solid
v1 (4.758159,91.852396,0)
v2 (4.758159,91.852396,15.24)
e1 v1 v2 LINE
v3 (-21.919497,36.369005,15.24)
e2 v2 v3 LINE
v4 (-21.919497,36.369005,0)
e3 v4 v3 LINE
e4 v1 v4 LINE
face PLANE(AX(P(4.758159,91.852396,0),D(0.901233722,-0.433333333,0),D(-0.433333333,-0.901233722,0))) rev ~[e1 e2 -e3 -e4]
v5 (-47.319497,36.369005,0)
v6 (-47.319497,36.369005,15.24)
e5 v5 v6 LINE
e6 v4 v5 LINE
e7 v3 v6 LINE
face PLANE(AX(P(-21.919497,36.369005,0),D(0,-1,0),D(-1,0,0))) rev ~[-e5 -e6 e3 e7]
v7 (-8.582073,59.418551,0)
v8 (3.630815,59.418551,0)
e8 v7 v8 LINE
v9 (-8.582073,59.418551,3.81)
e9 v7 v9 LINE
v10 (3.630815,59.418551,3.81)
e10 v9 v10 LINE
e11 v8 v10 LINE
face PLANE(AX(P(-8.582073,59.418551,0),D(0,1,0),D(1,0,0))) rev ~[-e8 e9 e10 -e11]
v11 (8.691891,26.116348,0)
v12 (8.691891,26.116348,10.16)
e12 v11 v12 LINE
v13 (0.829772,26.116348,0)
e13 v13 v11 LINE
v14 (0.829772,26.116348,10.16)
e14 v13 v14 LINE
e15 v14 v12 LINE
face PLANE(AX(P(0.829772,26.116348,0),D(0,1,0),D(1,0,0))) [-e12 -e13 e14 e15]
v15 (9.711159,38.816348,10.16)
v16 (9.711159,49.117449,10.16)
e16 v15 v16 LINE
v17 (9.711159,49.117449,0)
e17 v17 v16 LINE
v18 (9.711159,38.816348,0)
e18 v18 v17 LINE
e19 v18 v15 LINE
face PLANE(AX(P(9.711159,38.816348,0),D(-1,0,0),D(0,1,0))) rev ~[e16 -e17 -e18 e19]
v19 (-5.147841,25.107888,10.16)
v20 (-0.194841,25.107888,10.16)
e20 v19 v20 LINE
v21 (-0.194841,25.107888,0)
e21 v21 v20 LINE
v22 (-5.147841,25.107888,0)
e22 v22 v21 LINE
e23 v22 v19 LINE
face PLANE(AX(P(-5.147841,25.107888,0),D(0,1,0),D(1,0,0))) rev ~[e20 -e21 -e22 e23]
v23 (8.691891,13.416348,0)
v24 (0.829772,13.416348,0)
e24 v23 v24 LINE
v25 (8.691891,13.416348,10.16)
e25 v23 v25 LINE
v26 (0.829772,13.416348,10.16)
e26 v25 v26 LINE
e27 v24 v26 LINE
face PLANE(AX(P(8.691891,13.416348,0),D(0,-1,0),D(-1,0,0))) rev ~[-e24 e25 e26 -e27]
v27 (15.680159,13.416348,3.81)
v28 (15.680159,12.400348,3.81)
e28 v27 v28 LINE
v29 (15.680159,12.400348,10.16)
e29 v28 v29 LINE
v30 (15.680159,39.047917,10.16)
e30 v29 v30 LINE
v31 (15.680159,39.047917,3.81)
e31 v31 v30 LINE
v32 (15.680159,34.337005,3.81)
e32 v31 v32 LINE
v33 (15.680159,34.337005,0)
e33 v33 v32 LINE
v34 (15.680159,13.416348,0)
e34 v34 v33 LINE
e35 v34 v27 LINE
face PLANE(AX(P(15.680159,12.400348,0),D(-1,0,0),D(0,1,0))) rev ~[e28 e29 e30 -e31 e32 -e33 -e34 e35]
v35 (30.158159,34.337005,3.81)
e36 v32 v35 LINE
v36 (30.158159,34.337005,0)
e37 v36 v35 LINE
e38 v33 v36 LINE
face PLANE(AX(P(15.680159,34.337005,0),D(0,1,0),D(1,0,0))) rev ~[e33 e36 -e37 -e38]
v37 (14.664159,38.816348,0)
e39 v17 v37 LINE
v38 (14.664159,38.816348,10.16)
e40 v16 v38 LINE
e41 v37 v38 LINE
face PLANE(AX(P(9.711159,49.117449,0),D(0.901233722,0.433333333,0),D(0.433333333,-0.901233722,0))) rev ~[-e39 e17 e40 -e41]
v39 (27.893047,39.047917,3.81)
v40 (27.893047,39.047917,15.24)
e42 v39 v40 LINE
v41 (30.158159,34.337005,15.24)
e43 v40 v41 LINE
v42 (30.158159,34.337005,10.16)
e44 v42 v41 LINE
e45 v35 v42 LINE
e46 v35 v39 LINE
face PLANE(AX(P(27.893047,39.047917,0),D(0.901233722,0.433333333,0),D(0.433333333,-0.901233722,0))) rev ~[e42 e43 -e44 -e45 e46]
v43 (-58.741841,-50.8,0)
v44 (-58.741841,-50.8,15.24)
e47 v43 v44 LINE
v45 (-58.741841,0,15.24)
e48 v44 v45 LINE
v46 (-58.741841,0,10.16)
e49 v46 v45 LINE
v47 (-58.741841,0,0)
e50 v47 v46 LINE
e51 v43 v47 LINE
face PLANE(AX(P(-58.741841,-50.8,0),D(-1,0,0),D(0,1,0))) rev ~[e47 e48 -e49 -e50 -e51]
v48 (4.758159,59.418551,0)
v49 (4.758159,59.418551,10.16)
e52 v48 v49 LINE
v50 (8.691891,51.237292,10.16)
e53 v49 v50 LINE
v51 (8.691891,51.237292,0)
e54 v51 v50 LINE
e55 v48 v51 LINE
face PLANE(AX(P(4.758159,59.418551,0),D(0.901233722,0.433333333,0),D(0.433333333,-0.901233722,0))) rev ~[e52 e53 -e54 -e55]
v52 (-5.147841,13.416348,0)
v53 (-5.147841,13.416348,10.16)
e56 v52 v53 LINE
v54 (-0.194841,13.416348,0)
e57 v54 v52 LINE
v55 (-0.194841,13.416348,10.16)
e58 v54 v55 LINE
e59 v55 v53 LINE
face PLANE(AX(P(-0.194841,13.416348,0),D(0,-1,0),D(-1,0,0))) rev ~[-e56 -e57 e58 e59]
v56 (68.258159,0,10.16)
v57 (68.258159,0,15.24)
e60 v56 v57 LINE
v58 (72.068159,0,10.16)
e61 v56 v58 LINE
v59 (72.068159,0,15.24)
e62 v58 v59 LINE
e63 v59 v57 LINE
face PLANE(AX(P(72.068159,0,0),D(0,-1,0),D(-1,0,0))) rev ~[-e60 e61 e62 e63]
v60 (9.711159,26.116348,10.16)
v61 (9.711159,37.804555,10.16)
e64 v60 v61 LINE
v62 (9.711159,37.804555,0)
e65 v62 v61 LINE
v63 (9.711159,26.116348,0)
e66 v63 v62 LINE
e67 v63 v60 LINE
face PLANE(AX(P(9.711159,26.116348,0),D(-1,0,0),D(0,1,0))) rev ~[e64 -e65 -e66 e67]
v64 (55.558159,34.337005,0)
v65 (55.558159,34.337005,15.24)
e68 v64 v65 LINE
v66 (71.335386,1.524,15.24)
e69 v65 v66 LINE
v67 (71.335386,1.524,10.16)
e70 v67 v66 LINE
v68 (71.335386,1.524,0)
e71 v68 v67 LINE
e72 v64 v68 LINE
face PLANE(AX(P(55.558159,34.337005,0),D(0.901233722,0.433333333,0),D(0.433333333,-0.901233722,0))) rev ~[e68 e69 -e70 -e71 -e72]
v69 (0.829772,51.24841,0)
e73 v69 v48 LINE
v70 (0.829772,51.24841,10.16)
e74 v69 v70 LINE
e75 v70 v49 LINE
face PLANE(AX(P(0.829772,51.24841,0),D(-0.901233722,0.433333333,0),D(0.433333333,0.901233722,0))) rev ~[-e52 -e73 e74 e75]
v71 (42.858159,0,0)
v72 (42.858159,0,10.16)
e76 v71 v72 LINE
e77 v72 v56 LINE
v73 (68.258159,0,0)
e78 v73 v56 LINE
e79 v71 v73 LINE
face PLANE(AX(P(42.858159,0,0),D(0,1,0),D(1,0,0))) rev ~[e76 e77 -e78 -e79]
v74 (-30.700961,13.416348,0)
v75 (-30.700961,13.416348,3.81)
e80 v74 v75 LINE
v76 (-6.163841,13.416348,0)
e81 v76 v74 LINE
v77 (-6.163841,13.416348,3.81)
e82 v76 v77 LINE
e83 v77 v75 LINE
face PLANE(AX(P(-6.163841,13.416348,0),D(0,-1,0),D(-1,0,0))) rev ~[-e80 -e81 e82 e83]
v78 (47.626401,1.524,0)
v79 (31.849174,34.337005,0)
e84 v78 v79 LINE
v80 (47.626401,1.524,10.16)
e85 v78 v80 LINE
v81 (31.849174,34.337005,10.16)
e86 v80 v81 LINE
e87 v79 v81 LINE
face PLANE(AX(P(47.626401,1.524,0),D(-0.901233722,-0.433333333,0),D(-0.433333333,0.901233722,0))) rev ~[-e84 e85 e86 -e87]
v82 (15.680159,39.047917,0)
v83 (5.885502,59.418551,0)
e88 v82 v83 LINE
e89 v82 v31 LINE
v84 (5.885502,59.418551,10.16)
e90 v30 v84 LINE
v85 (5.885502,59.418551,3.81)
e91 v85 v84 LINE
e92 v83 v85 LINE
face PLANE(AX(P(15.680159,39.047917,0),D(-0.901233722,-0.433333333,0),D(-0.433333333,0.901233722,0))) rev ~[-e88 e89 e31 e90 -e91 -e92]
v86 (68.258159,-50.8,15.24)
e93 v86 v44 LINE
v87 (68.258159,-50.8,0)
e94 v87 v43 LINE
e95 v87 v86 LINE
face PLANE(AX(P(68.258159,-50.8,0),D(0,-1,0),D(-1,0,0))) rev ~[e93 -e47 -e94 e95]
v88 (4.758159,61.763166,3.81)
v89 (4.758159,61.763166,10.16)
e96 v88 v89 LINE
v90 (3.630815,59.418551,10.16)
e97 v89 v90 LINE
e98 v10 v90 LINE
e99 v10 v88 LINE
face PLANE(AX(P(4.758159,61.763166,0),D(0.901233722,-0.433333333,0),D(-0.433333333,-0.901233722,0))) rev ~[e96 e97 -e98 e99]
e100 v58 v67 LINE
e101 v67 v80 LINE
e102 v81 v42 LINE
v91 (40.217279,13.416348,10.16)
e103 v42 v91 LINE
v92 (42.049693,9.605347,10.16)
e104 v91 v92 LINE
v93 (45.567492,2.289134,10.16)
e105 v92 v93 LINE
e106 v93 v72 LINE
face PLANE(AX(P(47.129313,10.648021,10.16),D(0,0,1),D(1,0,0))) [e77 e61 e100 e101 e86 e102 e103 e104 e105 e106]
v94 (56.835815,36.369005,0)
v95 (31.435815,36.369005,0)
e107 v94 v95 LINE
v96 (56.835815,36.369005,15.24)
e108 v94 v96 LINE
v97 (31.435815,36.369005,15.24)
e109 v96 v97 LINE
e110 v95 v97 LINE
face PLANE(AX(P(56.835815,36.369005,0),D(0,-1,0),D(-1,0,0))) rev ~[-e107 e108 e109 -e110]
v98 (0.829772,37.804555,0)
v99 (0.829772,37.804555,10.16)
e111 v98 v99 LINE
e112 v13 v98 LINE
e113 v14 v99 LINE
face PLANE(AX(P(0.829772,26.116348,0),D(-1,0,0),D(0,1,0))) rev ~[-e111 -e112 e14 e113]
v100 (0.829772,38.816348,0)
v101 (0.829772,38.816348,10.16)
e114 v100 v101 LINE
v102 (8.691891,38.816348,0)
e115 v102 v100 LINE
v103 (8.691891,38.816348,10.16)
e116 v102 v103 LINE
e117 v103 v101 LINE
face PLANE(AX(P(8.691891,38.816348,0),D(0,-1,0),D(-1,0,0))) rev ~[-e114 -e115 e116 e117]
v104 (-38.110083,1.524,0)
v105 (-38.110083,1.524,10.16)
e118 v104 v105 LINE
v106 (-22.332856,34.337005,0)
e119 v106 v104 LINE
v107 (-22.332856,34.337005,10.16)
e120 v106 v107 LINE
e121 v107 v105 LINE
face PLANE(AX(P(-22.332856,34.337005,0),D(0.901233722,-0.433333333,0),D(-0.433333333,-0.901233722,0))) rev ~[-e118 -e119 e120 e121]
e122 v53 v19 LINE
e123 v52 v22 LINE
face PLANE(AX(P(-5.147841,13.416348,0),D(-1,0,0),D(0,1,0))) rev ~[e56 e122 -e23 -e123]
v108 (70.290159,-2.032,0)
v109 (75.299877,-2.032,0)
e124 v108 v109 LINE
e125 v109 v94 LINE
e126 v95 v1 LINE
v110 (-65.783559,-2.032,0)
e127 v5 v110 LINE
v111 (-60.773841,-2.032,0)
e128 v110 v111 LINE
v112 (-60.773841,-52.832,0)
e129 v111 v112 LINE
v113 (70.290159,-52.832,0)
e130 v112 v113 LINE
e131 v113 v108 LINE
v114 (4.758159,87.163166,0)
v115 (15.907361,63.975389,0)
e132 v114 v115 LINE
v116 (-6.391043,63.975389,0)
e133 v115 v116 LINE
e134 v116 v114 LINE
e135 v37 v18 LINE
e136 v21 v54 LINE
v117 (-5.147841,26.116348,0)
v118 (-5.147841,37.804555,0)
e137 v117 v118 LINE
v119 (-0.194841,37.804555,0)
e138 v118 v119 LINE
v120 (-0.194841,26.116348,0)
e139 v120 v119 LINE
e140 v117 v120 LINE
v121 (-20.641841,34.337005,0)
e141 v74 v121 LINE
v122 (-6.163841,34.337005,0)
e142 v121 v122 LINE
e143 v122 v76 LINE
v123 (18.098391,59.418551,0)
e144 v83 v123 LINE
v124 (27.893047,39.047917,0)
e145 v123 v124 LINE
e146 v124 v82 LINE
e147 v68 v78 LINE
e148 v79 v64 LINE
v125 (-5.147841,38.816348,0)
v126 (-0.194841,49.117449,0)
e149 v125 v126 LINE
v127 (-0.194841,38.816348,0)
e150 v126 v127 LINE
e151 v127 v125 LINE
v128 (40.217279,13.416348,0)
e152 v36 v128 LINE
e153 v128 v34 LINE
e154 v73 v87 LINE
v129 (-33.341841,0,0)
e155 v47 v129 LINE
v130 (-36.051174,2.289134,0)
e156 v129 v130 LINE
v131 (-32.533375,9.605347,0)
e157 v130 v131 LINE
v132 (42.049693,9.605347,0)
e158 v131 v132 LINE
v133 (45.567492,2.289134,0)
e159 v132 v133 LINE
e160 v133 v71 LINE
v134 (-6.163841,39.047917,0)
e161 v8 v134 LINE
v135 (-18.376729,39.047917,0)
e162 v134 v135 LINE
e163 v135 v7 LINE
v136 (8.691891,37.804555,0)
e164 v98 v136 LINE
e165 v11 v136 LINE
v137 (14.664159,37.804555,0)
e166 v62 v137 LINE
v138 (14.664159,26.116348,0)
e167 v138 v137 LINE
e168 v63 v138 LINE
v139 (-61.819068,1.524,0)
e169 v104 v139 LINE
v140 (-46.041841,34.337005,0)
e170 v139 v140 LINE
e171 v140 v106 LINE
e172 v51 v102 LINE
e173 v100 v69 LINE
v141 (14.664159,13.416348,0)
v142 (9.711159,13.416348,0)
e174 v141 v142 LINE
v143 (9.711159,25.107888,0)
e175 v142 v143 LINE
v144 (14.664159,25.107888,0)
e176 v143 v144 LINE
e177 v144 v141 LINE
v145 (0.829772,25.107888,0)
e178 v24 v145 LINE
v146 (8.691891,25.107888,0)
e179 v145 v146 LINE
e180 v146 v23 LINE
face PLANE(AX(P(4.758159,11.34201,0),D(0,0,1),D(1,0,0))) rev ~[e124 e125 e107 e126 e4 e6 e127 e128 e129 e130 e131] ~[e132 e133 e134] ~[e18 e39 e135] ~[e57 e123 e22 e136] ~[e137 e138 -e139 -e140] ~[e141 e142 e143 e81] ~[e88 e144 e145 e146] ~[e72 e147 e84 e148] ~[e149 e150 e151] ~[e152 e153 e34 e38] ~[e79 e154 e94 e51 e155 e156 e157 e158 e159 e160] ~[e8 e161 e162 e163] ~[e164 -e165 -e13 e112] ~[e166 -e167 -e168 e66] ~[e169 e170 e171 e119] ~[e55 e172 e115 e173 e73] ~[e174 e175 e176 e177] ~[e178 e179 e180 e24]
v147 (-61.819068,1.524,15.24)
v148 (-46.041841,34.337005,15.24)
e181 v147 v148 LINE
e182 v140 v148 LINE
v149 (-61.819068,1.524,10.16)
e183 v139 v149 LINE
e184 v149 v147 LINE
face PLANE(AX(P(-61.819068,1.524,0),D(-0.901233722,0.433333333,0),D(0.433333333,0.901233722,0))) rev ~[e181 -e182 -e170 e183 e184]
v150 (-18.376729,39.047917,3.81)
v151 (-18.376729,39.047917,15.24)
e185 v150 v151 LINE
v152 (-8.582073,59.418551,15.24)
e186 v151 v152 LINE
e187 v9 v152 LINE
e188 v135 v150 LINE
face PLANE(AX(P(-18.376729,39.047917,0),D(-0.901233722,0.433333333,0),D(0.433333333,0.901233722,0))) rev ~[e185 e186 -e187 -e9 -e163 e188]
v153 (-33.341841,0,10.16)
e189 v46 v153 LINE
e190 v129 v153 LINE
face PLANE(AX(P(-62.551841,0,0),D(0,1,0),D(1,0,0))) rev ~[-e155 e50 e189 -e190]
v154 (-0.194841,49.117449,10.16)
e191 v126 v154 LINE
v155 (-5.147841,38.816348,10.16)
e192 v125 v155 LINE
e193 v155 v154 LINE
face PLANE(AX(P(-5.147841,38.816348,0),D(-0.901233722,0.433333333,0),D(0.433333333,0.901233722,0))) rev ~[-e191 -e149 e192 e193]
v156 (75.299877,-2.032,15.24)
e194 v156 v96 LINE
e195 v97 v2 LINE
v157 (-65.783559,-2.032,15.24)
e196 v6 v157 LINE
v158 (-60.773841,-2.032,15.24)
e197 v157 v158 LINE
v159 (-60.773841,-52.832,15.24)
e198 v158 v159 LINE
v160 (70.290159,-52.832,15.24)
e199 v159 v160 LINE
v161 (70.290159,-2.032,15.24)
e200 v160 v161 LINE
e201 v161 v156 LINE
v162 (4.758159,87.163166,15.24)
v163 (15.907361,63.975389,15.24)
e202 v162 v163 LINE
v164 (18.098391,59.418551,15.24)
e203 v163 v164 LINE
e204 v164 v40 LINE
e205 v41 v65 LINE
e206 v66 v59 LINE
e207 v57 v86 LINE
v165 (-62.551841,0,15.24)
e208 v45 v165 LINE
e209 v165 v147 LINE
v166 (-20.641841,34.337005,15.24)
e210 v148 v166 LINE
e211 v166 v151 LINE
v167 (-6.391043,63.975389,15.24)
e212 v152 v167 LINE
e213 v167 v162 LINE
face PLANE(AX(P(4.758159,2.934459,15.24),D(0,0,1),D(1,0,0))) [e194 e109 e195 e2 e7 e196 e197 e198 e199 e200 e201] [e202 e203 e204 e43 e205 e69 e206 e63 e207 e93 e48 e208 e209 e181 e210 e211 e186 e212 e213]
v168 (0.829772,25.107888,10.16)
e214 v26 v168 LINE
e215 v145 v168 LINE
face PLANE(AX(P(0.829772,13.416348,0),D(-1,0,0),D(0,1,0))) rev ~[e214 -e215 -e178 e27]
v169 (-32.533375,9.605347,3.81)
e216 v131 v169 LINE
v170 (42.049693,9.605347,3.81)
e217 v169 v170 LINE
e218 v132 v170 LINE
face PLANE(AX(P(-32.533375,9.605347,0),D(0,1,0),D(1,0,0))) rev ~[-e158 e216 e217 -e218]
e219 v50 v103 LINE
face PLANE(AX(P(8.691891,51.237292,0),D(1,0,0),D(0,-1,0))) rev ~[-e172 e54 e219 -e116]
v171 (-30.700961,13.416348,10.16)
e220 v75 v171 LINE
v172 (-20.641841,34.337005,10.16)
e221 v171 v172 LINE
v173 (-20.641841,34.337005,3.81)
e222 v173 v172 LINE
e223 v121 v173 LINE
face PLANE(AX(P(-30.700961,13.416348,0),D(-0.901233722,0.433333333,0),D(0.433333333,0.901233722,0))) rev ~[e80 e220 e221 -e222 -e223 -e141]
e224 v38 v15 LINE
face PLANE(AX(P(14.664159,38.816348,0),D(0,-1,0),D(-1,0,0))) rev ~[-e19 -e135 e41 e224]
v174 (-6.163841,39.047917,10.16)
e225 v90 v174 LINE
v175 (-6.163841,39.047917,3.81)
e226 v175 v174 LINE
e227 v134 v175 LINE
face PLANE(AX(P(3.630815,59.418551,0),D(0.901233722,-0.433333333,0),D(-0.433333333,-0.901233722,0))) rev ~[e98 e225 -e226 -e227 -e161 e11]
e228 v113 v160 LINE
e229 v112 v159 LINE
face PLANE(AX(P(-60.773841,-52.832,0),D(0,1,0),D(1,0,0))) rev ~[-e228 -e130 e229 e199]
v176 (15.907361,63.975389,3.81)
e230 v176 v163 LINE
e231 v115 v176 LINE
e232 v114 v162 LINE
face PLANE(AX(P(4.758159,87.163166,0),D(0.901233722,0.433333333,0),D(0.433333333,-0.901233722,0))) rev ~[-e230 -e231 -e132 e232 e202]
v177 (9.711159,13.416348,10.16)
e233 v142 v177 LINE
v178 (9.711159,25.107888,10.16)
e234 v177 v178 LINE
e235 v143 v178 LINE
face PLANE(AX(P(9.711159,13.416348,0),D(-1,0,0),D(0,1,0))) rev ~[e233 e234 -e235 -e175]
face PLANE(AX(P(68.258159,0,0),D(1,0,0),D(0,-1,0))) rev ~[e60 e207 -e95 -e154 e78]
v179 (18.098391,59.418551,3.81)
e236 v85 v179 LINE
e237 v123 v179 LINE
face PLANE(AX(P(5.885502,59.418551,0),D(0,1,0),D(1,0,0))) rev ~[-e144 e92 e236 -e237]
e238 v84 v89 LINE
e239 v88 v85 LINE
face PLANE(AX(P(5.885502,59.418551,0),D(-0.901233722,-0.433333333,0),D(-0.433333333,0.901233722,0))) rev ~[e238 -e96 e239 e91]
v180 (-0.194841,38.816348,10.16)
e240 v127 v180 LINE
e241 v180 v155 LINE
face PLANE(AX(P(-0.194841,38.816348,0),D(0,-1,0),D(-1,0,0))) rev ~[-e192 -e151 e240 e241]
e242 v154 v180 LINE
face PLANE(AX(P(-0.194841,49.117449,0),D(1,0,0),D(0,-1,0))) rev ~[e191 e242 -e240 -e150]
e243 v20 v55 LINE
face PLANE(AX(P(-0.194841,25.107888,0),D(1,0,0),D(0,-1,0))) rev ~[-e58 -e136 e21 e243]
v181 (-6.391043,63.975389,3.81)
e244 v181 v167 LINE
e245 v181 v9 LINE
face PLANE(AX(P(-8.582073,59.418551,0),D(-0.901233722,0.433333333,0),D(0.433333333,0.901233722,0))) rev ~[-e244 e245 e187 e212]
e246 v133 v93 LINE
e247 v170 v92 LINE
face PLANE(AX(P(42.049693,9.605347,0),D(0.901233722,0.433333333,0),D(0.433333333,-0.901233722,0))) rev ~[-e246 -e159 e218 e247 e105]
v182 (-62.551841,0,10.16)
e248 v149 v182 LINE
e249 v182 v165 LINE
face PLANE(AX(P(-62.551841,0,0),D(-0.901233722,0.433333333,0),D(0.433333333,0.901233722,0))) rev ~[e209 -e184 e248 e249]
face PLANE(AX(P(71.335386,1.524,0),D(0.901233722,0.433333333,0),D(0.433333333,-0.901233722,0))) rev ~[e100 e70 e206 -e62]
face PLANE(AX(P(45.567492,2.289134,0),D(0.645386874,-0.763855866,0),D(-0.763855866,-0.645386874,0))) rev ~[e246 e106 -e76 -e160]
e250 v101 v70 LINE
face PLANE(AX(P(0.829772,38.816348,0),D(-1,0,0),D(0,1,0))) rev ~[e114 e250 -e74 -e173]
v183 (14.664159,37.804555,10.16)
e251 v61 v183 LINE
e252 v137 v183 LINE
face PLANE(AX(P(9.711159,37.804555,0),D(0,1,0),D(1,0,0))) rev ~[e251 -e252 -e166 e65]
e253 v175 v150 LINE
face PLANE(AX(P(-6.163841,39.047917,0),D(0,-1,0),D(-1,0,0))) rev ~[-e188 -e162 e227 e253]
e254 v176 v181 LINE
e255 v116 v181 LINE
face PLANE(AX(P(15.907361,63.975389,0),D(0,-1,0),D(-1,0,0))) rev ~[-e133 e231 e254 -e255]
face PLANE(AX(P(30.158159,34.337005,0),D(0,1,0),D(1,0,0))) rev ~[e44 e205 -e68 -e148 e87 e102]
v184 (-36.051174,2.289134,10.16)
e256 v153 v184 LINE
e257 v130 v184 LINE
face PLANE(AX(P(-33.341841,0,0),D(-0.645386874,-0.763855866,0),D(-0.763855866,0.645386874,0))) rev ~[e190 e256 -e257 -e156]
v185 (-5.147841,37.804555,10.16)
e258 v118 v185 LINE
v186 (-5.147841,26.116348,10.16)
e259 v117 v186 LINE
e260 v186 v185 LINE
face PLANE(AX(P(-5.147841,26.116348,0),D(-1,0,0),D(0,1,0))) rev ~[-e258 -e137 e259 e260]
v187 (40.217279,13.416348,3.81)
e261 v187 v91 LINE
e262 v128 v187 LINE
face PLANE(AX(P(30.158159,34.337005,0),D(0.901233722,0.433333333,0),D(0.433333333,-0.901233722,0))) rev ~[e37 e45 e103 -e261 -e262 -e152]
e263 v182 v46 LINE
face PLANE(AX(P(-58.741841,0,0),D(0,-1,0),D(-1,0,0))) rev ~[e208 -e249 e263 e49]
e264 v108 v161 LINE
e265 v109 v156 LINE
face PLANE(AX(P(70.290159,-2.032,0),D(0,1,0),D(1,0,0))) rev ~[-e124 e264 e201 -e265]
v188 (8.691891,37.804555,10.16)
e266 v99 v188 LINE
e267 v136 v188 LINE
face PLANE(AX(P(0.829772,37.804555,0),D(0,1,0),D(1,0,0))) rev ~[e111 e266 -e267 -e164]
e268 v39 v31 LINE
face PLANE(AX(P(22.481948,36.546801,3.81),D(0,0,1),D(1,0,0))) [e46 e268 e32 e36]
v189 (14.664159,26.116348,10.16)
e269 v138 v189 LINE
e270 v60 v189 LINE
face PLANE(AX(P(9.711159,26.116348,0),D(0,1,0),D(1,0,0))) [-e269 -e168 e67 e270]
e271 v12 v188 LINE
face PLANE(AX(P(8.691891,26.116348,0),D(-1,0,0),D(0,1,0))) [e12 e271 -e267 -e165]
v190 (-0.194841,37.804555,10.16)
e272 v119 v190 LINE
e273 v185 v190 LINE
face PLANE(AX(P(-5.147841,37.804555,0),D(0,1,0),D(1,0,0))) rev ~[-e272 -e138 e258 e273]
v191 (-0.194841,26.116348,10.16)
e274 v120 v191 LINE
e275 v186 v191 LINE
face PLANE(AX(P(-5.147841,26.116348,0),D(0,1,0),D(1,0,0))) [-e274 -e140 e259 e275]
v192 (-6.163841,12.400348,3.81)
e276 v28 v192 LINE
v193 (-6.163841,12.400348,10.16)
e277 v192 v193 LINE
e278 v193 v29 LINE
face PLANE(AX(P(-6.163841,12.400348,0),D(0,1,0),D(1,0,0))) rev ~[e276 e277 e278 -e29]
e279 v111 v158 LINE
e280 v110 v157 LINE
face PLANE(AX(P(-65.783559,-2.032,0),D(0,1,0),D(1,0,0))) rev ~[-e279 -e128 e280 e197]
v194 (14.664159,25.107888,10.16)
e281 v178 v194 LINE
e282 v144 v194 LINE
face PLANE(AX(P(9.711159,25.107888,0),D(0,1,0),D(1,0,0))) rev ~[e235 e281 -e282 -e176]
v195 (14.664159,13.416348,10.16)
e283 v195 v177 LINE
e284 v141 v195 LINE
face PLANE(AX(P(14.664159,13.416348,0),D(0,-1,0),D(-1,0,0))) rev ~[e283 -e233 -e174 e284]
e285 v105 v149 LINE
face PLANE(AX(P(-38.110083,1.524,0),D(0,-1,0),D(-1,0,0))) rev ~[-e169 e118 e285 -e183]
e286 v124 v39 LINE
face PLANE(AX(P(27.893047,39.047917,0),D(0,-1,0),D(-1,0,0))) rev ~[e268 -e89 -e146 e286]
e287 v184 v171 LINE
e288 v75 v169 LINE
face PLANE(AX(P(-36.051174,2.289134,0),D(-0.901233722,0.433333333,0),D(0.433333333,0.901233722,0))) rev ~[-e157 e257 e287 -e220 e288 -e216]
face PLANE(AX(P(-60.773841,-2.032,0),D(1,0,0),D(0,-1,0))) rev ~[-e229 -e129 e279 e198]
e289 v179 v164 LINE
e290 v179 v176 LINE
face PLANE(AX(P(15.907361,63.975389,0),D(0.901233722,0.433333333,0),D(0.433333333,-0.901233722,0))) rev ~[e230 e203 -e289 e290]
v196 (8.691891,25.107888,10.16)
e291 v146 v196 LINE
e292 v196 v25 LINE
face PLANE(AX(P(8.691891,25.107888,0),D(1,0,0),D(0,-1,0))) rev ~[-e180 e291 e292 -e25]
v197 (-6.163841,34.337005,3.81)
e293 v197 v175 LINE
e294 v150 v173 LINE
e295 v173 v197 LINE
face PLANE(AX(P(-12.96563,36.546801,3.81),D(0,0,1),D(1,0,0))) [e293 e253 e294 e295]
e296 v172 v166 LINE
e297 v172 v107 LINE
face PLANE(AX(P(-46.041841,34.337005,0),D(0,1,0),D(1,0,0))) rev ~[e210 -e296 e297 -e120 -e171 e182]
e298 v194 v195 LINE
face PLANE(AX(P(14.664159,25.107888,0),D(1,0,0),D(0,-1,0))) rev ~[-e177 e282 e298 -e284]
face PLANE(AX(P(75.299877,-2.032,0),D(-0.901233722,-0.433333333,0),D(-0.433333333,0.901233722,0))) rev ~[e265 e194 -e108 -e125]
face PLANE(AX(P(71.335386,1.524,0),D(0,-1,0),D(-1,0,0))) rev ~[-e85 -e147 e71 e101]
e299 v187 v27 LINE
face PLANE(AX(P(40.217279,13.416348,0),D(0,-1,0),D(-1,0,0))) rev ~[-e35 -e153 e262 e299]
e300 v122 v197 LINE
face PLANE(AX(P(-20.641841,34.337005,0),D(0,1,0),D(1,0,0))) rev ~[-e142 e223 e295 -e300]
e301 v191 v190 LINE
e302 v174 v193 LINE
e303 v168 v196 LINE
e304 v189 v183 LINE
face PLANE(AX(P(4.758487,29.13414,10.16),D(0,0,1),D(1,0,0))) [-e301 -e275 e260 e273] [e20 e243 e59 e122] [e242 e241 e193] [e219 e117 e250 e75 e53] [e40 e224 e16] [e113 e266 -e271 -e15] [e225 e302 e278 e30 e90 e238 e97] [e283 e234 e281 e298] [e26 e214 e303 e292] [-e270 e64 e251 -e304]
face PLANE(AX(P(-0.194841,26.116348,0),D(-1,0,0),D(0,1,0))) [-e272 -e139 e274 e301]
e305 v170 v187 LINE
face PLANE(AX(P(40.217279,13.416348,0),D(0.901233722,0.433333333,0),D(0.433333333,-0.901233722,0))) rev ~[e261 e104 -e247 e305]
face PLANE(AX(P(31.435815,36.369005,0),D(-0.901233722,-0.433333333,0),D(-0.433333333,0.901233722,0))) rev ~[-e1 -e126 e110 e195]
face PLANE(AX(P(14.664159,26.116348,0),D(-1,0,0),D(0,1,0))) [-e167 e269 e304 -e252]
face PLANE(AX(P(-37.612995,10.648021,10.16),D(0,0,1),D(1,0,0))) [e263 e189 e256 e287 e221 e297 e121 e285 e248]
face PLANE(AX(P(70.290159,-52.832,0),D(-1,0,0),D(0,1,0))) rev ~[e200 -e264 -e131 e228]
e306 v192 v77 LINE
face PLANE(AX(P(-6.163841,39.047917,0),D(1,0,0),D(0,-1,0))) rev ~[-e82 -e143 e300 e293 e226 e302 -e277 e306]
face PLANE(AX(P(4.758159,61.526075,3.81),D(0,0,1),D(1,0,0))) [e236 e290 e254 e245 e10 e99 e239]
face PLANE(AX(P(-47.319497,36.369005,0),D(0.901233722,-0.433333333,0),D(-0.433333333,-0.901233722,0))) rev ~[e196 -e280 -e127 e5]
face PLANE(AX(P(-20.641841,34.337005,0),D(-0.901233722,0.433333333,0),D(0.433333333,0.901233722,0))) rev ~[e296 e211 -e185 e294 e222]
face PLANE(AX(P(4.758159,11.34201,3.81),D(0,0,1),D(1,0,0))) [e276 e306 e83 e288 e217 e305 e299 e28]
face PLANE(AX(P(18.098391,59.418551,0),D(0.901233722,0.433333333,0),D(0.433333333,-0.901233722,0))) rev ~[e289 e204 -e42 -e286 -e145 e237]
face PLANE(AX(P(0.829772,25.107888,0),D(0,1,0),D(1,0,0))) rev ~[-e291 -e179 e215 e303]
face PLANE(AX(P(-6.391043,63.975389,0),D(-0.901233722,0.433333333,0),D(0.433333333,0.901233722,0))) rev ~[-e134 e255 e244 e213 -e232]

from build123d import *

# Parameters (mm, degrees)
F1_DEPTH = 15.24
F2_DEPTH = 10.16
F0_W     = 4.953
F0_H     = 11.6882068259
F0_W_2   = 7.8621185967
F3_DEPTH = 10.16
F4_DEPTH = 3.81


# Not quite as in the source:
# - a feature names something its author has since deleted; it is built from what else it names


with BuildPart() as f1:
    # F0 (on Top) → F1 (new body)
    with BuildSketch(Plane.XY):
        Polygon((56.8358146836, 36.3690045497), (31.4358146836, 36.3690045497), (4.7581588602, 91.852396227), (-21.9194969632, 36.3690045497), (-23.4601999485, 36.3690045497), (-47.3194969632, 36.3690045497), (-63.1618590029, 3.4205332163), (-65.7835588108, -2.0319997298), (-60.7738408696, -2.0319997298), (-60.7738408696, -52.8319997298), (70.29015859, -52.8319997298), (70.29015859, -2.0319997298), (75.2998765312, -2.0319997298), (72.6781767233, 3.4205332163), align=None)
        Polygon((68.2581588602, -50.8), (-58.7418411398, -50.8), (-58.7418411398, 0), (-62.5518411398, 0), (-61.8190678495, 1.524), (-46.0418411398, 34.3370048199), (-22.332856425, 34.3370048199), (-20.6418411398, 34.3370048199), (-18.376729311, 39.0479167388), (-8.5820728345, 59.4185506966), (-6.3910428531, 63.9753894023), (4.7581588602, 87.1631660812), (15.9073605735, 63.9753894023), (18.0983905549, 59.4185506966), (27.8930470314, 39.0479167388), (30.1581588602, 34.3370048199), (31.8491741455, 34.3370048199), (55.5581588602, 34.3370048199), (71.3353855699, 1.524), (72.0681588602, 0), (68.2581588602, 0), align=None, mode=Mode.SUBTRACT)
    extrude(amount=F1_DEPTH)

    # F0 (on Top) → F2 (join)
    with BuildSketch(Plane.XY):
        Polygon((-62.5518411398, 0), (-58.7418411398, 0), (-33.3418411398, 0), (-36.0511744731, 2.2891336547), (-32.5333754715, 9.6053469359), (-30.7009610057, 13.4163478047), (-20.6418411398, 34.3370048199), (-22.332856425, 34.3370048199), (-38.1100831348, 1.524), (-58.7418411398, 1.524), (-61.8190678495, 1.524), align=None)
        Polygon((42.8581588602, 0), (68.2581588602, 0), (72.0681588602, 0), (71.3353855699, 1.524), (68.2581588602, 1.524), (47.6264008552, 1.524), (31.8491741455, 34.3370048199), (30.1581588602, 34.3370048199), (40.2172787262, 13.4163478047), (42.0496931919, 9.6053469359), (45.5674921935, 2.2891336547), align=None)
    extrude(amount=F2_DEPTH)



with BuildPart() as f3:
    # F0 (on Top) → F3 (new body)
    with BuildSketch(Plane.XY):
        Polygon((-6.1638411398, 34.3370048199), (-6.1638411398, 13.4163478047), (-5.1478411398, 13.4163478047), (-5.1478411398, 25.1078879876), (-0.1948411398, 25.1078879876), (-0.1948411398, 13.4163478047), (0.8297724999, 13.4163478047), (0.8297724999, 25.1078879876), (8.6918910965, 25.1078879876), (8.6918910965, 13.4163478047), (9.7111588602, 13.4163478047), (9.7111588602, 25.1078879876), (14.6641588602, 25.1078879876), (14.6641588602, 13.4163478047), (15.6801588602, 13.4163478047), (15.6801588602, 34.3370048199), (15.6801588602, 39.0479167388), (5.8855023837, 59.4185506966), (4.7581588602, 59.4185506966), (3.6308153367, 59.4185506966), (-6.1638411398, 39.0479167388), align=None)
        with Locations((-2.6713411398, 31.9604512176)):
            Rectangle(F0_W, F0_H, mode=Mode.SUBTRACT)
        Polygon((-5.1478411398, 38.8163478047), (-0.1948411398, 49.1174492506), (-0.1948411398, 38.8163478047), align=None, mode=Mode.SUBTRACT)
        with Locations((4.7608317982, 31.9604512176)):
            Rectangle(F0_W_2, F0_H, mode=Mode.SUBTRACT)
        with Locations((12.1876588602, 31.9604512176)):
            Rectangle(F0_W, F0_H, mode=Mode.SUBTRACT)
        Polygon((9.7111588602, 49.1174492506), (14.6641588602, 38.8163478047), (9.7111588602, 38.8163478047), align=None, mode=Mode.SUBTRACT)
        Polygon((0.8297724999, 51.2484100915), (4.7581588602, 59.4185506966), (8.6918910965, 51.2372918984), (8.6918910965, 38.8163478047), (0.8297724999, 38.8163478047), align=None, mode=Mode.SUBTRACT)
        Polygon((4.7581588602, 61.7631660812), (3.6308153367, 59.4185506966), (4.7581588602, 59.4185506966), (5.8855023837, 59.4185506966), align=None)
        Polygon((-5.1478411398, 13.4163478047), (-6.1638411398, 13.4163478047), (-6.1638411398, 12.4003478047), (15.6801588602, 12.4003478047), (15.6801588602, 13.4163478047), (14.6641588602, 13.4163478047), (9.7111588602, 13.4163478047), (8.6918910965, 13.4163478047), (0.8297724999, 13.4163478047), (-0.1948411398, 13.4163478047), align=None)
    extrude(amount=F3_DEPTH)


with BuildPart() as f1_1:
    add(f1.part)

    add(f3.part)  # F4 merges F3
    # F0 (on Top) → F4 (join)
    with BuildSketch(Plane.XY):
        Polygon((-30.7009610057, 13.4163478047), (-32.5333754715, 9.6053469359), (42.0496931919, 9.6053469359), (40.2172787262, 13.4163478047), (15.6801588602, 13.4163478047), (15.6801588602, 12.4003478047), (-6.1638411398, 12.4003478047), (-6.1638411398, 13.4163478047), align=None)
        Polygon((-18.376729311, 39.0479167388), (-20.6418411398, 34.3370048199), (-6.1638411398, 34.3370048199), (-6.1638411398, 39.0479167388), align=None)
        Polygon((15.6801588602, 34.3370048199), (30.1581588602, 34.3370048199), (27.8930470314, 39.0479167388), (15.6801588602, 39.0479167388), align=None)
        Polygon((-6.3910428531, 63.9753894023), (-8.5820728345, 59.4185506966), (3.6308153367, 59.4185506966), (4.7581588602, 61.7631660812), (5.8855023837, 59.4185506966), (18.0983905549, 59.4185506966), (15.9073605735, 63.9753894023), align=None)
    extrude(amount=F4_DEPTH)


solid = f1_1.part
